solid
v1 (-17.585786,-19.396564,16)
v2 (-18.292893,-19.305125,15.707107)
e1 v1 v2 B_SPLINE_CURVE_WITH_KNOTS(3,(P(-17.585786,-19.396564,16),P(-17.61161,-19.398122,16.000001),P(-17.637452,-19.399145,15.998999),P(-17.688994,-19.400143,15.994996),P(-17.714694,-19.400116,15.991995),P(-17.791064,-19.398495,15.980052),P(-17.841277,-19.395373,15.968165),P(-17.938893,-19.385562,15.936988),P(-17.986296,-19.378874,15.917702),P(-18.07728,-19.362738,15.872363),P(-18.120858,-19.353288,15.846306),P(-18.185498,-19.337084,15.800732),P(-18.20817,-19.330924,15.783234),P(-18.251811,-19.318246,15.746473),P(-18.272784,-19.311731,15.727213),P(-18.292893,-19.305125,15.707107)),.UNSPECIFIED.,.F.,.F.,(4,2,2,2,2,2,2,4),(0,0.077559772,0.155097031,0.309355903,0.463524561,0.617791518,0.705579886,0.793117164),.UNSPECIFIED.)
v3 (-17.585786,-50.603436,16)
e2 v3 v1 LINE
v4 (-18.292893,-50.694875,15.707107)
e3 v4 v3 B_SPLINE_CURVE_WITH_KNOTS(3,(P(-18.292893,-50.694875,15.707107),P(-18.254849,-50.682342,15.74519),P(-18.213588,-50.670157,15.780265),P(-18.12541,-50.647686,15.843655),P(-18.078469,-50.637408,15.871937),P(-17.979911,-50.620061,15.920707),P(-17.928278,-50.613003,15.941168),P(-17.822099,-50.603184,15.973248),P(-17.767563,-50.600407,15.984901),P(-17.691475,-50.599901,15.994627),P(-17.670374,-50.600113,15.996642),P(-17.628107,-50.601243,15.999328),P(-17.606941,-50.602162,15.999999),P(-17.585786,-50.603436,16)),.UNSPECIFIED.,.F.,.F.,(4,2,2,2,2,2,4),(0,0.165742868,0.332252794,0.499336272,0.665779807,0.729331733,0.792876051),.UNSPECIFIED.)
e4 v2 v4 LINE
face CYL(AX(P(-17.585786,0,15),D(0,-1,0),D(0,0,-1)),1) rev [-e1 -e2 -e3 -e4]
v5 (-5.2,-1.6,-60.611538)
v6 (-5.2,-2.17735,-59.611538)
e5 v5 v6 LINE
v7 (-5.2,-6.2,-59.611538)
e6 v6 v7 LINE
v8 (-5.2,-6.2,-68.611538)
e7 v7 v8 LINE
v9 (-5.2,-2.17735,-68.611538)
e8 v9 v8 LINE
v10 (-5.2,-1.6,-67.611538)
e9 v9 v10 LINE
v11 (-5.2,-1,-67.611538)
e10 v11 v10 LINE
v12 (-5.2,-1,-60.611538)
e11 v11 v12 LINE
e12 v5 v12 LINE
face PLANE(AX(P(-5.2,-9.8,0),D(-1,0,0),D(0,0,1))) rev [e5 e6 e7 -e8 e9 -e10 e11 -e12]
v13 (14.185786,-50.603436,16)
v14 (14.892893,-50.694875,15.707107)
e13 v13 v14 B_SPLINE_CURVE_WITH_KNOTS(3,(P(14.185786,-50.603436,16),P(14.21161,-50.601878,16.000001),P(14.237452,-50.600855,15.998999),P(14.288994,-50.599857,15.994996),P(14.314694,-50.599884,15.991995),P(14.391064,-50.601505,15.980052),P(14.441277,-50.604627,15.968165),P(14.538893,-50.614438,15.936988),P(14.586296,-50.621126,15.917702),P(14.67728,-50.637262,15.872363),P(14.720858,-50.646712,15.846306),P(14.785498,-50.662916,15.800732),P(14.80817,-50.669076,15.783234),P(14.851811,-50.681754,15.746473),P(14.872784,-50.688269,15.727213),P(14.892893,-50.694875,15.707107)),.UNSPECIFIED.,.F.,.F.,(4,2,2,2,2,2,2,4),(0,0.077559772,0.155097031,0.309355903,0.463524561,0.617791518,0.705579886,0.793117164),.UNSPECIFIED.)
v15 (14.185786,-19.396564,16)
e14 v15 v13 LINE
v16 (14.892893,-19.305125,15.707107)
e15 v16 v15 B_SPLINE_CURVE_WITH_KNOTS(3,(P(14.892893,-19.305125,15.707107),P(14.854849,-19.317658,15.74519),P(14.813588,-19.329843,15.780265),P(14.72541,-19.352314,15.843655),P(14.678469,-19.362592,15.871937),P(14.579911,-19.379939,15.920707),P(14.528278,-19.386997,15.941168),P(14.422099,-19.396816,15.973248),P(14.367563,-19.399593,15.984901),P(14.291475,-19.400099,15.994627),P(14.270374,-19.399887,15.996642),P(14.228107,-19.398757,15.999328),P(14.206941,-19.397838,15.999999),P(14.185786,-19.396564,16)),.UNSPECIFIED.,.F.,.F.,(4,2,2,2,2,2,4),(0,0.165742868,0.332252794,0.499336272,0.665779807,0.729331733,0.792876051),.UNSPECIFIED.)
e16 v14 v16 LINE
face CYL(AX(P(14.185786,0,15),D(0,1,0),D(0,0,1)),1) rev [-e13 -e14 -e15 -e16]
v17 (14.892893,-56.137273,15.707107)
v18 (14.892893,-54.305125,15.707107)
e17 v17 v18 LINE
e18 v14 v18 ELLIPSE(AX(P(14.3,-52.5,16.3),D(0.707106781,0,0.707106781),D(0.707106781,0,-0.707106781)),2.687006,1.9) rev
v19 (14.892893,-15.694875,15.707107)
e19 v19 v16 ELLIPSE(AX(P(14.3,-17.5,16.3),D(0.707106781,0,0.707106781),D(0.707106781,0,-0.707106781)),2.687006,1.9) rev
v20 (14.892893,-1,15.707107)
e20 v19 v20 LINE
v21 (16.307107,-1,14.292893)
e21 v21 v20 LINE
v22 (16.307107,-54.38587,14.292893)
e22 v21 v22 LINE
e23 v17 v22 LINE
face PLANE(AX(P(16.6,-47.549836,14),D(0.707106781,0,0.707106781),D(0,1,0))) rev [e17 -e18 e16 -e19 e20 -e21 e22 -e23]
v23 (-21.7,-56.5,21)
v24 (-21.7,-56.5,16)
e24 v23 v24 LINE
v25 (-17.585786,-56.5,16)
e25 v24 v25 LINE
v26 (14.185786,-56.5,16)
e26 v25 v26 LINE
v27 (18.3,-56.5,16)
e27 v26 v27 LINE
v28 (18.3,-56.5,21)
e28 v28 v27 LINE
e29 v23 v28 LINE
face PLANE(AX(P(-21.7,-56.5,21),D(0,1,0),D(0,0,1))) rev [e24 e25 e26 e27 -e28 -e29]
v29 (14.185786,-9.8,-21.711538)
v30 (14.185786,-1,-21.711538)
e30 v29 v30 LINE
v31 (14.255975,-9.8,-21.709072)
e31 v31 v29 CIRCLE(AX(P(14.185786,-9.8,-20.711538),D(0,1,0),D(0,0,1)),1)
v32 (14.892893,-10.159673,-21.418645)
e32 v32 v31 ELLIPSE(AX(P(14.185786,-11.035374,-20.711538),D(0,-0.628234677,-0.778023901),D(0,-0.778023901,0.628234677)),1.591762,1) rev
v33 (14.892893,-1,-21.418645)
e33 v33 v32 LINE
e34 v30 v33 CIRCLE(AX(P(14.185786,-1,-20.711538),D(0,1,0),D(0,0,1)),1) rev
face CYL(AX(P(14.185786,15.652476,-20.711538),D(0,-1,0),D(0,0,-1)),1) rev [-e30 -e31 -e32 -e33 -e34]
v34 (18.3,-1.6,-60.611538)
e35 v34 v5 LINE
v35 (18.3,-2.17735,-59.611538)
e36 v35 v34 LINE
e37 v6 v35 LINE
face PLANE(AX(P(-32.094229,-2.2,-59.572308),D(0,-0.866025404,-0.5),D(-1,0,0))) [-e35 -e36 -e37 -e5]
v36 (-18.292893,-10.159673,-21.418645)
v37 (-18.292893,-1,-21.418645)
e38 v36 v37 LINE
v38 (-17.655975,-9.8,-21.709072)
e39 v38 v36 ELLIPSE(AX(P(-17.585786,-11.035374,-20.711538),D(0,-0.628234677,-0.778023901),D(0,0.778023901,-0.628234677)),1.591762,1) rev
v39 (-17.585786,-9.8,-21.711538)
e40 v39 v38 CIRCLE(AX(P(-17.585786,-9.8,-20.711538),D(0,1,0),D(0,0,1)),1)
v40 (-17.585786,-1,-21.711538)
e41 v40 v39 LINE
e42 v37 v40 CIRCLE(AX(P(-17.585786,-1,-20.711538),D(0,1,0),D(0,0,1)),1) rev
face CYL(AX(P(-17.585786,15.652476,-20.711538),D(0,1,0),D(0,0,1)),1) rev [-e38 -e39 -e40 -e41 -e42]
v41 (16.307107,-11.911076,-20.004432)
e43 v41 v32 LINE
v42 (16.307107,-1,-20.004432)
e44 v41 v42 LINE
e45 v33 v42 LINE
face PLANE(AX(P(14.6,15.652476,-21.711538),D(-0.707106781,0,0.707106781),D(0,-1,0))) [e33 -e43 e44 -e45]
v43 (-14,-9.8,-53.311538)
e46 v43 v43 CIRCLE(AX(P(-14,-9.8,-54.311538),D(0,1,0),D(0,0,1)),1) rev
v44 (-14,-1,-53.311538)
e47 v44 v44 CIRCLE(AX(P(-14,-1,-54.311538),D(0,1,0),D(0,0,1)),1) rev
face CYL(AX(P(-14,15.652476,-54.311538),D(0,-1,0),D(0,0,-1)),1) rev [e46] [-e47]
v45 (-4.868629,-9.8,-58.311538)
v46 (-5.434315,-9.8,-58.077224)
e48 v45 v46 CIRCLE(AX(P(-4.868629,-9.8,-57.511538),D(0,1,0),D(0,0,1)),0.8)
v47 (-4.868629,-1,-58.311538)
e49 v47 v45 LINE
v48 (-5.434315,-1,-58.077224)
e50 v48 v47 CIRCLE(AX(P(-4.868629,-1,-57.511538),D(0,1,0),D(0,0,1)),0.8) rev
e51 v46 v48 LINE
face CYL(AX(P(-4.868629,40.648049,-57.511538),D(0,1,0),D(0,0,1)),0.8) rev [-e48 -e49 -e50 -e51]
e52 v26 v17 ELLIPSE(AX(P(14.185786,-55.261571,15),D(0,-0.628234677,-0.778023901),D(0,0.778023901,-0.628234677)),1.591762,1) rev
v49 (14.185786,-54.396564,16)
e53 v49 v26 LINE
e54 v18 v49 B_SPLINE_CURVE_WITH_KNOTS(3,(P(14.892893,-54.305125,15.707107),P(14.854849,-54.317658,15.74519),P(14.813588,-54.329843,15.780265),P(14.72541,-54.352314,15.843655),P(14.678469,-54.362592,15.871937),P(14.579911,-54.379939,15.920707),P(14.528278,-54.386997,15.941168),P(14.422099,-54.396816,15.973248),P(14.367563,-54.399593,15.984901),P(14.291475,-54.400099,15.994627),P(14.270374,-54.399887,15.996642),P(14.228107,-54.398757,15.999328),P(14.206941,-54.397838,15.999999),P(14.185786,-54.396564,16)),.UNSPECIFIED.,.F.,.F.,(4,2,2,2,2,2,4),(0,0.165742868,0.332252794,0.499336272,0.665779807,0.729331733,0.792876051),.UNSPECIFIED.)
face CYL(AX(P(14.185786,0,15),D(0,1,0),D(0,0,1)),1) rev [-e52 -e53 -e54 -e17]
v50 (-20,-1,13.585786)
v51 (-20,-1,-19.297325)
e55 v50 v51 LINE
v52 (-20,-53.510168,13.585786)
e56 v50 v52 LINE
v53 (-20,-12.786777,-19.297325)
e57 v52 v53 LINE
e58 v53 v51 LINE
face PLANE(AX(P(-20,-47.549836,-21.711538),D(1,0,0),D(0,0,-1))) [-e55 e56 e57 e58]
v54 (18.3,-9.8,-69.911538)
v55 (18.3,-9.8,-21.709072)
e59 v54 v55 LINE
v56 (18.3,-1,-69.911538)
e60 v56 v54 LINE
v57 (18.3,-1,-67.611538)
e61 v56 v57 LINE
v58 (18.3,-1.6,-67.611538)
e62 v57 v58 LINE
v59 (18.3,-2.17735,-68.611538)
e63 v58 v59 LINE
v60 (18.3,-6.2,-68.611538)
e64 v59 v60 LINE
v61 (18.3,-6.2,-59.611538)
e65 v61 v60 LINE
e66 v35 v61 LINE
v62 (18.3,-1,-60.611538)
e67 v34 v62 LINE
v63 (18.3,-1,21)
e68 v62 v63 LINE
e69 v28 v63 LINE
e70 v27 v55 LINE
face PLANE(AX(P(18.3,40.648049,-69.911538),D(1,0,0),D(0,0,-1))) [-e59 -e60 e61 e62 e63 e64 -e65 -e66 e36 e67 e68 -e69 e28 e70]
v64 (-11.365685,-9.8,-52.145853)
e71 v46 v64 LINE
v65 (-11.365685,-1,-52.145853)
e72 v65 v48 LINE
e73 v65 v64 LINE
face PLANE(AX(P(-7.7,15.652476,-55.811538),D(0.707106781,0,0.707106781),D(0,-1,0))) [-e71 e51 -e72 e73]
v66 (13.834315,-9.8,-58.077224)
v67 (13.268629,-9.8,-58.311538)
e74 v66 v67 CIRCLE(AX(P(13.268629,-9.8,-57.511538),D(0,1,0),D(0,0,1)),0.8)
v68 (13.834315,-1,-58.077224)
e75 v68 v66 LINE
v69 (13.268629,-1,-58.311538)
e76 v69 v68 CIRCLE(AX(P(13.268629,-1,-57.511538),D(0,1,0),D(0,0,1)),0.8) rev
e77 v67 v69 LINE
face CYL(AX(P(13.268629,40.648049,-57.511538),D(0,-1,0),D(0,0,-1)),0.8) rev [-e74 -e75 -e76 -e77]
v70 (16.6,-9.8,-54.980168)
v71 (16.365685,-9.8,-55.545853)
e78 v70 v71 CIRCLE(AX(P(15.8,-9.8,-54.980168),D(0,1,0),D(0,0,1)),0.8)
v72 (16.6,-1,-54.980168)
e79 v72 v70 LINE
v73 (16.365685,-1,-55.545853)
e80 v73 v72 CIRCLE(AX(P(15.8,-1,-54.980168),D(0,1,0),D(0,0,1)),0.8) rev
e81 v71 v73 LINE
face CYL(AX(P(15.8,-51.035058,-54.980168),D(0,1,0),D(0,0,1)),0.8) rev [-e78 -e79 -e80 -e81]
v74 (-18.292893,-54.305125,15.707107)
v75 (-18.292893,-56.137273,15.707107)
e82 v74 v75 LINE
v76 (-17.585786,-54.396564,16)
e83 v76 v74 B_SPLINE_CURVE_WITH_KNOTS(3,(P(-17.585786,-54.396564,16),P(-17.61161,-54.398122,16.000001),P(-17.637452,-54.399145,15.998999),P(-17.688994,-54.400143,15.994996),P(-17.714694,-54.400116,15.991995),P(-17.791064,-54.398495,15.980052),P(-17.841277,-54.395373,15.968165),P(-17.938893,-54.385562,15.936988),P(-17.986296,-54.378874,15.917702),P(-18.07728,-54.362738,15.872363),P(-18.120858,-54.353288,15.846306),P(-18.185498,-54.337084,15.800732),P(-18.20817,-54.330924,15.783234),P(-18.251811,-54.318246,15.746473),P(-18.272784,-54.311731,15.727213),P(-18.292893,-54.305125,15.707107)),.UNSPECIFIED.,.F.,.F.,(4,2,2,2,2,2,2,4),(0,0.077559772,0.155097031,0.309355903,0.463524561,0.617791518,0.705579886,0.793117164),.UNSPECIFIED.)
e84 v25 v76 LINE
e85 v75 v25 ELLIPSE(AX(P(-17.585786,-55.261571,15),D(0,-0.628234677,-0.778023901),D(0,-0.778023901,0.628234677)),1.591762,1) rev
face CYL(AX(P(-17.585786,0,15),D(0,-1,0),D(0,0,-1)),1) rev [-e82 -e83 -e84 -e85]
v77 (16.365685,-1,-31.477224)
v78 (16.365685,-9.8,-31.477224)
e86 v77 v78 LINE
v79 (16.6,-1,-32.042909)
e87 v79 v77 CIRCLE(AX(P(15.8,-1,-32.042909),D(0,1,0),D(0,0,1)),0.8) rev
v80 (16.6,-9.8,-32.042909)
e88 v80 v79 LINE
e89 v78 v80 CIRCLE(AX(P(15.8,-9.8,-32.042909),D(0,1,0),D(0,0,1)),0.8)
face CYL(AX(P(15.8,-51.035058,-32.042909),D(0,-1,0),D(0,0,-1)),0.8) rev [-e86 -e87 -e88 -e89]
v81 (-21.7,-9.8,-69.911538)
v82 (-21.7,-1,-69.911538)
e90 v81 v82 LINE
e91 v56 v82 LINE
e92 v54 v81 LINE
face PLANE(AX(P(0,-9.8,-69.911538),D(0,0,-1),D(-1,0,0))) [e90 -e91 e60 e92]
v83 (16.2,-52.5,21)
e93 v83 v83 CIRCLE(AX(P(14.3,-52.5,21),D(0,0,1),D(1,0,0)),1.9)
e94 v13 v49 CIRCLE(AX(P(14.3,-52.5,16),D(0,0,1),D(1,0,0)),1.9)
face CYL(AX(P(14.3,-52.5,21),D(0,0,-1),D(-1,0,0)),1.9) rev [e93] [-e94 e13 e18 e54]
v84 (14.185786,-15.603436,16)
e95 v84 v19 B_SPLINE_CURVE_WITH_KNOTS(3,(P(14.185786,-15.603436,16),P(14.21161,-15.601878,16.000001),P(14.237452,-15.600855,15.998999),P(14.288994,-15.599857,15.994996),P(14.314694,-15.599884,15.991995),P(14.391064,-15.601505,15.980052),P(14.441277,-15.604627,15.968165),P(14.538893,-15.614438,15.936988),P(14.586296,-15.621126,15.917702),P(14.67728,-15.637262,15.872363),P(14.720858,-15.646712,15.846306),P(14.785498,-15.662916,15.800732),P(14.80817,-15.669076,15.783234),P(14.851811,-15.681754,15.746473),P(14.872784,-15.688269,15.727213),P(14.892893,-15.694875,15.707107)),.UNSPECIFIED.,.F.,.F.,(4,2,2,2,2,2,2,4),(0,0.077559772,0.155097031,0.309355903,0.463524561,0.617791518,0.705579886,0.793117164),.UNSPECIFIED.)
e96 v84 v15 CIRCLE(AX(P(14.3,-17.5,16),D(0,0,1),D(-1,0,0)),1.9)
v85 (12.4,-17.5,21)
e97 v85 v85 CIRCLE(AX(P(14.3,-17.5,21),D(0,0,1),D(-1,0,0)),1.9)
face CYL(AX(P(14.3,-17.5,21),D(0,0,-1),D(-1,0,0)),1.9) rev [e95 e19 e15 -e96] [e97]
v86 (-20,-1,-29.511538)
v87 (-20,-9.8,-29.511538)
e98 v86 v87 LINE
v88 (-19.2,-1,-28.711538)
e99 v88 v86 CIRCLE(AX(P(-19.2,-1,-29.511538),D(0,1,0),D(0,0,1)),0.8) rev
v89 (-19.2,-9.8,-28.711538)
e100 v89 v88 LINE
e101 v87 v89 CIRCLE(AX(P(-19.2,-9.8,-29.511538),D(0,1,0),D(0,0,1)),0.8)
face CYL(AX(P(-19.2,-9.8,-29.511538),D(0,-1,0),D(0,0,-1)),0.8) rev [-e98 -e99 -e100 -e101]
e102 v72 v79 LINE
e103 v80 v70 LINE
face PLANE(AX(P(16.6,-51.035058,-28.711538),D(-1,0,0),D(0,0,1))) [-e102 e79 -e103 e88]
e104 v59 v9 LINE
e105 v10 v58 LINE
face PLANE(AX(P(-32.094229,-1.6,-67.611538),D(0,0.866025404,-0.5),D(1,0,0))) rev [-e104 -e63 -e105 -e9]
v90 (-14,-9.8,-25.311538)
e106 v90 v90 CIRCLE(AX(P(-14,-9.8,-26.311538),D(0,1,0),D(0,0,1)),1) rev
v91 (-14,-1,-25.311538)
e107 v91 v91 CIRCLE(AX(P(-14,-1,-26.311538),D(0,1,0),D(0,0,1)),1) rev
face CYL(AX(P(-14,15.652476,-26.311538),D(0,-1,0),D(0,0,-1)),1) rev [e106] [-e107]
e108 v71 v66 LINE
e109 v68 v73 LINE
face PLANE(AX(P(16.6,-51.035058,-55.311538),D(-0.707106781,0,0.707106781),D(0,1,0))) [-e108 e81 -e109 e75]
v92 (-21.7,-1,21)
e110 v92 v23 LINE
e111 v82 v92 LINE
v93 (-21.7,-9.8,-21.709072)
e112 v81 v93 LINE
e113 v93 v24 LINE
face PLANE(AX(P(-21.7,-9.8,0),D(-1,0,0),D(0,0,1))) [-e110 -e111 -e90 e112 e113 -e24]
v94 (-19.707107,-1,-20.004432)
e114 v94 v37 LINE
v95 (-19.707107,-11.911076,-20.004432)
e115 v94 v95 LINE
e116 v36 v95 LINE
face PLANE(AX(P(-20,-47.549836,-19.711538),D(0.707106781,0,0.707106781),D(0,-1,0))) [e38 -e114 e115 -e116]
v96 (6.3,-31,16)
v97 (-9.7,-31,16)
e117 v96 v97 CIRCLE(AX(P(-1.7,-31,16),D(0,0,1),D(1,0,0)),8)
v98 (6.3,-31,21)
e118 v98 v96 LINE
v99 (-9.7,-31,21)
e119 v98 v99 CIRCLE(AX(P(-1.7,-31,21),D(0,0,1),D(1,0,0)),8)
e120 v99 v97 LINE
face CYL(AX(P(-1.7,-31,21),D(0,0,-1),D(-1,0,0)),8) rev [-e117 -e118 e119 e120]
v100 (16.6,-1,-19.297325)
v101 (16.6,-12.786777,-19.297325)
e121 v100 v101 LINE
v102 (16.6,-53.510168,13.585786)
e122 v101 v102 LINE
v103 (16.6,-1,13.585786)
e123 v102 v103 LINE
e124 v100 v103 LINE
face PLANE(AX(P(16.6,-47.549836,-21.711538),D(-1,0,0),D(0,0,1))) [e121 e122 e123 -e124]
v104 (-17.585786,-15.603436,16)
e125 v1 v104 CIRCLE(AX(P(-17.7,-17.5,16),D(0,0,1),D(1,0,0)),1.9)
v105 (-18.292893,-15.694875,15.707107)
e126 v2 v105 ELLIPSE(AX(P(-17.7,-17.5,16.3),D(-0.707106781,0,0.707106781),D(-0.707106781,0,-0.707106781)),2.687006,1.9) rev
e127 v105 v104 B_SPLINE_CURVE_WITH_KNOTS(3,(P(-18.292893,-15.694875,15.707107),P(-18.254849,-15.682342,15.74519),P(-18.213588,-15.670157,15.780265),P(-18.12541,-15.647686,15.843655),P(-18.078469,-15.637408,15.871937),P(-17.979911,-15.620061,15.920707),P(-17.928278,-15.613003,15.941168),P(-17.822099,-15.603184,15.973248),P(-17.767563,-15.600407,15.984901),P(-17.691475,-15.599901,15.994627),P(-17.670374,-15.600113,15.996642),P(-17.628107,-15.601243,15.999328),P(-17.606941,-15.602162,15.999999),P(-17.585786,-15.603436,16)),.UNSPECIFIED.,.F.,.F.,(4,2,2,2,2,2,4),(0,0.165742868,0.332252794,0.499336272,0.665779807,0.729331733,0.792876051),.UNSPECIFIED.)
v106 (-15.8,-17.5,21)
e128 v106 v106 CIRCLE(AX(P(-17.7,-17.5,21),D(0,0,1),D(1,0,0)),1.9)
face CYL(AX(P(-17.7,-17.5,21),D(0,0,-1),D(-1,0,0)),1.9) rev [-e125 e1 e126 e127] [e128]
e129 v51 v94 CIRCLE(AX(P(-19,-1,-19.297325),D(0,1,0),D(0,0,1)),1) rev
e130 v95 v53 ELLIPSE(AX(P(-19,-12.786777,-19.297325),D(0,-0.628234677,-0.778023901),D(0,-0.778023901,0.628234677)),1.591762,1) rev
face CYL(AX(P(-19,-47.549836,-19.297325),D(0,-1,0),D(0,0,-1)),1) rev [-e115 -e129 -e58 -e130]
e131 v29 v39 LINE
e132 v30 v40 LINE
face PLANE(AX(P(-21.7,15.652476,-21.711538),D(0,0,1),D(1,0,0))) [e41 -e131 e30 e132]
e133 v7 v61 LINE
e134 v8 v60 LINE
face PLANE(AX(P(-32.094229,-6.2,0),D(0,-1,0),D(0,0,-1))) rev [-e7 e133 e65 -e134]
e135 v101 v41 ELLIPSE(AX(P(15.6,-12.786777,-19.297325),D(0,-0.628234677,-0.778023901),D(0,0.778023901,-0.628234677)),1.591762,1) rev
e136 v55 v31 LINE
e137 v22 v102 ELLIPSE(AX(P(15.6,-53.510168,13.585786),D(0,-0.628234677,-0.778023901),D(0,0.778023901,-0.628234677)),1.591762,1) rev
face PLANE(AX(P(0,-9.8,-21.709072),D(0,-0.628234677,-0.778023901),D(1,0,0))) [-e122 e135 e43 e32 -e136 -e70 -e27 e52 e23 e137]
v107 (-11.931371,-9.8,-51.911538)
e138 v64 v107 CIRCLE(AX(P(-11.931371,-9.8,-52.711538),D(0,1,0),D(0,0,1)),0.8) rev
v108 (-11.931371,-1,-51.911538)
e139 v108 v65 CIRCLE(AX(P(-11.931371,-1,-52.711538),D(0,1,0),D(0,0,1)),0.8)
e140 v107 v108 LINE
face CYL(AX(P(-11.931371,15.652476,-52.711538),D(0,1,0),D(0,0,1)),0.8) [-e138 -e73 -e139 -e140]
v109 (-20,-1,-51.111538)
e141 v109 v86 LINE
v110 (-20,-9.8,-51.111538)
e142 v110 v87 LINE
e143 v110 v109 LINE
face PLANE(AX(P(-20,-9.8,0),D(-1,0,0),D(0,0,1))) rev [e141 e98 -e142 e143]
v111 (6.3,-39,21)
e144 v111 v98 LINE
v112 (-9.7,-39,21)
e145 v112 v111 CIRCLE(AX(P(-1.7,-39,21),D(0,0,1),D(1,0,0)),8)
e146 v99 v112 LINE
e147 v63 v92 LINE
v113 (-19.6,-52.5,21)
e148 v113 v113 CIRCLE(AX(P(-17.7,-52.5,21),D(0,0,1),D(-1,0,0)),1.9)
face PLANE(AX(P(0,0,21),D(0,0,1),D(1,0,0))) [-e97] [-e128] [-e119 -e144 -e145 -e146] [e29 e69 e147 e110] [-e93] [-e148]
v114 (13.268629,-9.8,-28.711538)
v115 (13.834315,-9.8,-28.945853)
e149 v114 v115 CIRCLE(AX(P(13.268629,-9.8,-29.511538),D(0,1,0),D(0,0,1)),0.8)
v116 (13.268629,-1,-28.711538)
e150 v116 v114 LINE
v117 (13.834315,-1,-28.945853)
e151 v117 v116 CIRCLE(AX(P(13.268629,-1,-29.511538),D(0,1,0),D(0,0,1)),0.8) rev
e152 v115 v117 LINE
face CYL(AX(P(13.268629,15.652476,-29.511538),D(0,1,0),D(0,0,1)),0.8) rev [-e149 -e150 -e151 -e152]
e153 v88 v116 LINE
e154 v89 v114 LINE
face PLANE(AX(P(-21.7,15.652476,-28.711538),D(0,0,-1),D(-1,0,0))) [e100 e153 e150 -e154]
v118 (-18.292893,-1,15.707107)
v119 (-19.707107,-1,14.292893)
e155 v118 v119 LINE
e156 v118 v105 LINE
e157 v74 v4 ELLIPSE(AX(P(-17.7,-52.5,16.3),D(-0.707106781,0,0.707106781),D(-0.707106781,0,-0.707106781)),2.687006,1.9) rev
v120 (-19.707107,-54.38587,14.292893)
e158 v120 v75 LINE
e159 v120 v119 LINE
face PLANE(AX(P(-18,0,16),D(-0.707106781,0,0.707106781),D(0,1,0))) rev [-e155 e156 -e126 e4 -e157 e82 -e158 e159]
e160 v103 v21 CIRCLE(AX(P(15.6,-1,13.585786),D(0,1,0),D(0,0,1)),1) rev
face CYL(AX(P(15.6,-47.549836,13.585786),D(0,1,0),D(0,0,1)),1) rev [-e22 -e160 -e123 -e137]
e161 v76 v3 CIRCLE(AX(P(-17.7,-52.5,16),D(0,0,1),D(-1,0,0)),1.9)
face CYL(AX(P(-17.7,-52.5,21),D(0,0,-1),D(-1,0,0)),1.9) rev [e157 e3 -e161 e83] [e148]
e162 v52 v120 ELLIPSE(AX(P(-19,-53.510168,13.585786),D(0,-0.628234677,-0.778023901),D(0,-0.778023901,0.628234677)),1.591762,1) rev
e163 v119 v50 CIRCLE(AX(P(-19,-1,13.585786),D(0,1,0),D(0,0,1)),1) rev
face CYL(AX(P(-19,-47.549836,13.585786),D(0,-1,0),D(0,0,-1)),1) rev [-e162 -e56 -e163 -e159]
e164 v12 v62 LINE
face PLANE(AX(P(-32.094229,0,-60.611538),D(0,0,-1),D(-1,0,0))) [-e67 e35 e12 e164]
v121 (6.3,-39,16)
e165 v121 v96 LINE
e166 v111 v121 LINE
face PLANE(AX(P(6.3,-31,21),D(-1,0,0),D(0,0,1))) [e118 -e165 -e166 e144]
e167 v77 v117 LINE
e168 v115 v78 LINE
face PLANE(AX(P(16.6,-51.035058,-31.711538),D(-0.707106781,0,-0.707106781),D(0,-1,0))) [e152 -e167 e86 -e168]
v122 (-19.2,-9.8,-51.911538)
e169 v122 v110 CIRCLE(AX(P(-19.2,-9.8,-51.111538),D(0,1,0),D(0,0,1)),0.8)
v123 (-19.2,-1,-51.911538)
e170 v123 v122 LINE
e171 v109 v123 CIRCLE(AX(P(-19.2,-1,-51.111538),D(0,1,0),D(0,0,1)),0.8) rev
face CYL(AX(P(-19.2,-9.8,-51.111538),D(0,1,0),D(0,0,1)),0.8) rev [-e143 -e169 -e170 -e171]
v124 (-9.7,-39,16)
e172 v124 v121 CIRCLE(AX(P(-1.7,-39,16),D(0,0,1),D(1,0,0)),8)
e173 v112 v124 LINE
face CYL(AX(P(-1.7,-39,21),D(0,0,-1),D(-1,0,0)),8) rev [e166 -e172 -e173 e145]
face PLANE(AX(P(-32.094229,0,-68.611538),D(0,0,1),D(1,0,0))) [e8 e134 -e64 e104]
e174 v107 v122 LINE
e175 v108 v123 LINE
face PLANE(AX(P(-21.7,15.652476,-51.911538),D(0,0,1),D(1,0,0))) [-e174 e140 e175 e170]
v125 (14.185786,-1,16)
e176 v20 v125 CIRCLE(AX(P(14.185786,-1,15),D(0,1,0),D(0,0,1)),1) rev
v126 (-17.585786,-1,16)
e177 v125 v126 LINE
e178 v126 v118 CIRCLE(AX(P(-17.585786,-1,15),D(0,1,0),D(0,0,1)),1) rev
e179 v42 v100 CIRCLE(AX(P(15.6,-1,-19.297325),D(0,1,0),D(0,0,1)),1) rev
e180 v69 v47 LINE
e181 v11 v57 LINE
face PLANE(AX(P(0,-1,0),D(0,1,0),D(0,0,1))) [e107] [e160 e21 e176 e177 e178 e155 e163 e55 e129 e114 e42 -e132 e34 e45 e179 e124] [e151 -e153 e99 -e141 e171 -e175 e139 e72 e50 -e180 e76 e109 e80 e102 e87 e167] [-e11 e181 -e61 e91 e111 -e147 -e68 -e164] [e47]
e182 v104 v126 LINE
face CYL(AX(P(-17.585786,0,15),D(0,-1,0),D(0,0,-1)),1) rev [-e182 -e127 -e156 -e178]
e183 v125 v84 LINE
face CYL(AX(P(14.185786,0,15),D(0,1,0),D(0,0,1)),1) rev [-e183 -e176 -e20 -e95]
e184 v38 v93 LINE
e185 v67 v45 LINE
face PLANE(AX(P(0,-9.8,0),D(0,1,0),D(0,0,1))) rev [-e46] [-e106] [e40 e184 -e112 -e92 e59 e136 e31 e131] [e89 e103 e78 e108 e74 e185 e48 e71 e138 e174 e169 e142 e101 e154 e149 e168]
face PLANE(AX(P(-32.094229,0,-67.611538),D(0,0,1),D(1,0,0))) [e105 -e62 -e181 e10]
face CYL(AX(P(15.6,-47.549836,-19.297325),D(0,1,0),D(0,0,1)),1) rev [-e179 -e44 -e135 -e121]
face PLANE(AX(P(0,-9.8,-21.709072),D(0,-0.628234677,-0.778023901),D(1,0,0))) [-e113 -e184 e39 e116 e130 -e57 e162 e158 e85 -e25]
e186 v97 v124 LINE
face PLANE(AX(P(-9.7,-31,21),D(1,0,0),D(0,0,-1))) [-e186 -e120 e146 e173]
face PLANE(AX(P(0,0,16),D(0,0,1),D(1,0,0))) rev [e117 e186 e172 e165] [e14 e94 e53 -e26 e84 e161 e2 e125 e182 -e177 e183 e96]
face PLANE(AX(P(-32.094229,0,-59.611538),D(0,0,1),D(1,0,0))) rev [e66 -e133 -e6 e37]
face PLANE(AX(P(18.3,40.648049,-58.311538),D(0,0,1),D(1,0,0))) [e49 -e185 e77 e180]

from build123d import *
from OCP.BRepFilletAPI import BRepFilletAPI_MakeChamfer

# Parameters (mm, degrees)
BOSS_EXTRUDE1_START      = -1
SKETCH1_W                = 1.7
SKETCH1_H                = 89.2
BOSS_EXTRUDE1_DEPTH      = 8.8
SKETCH4_W                = 40
SKETCH4_H                = 11.6
BOSS_EXTRUDE3_DEPTH      = 8.8
SERVO_HOLDER_DEPTH       = 1
SERVO_HOLDER_DEPTH_BACK  = 8.8
SKETCH3_W                = 14
SKETCH3_H                = 7
SKETCH3_R                = 1
SKETCH37_W               = 26
SKETCH37_H               = 7
BOSS_EXTRUDE19_DEPTH     = 9.8
CUT_EXTRUDE10_DEPTH      = 93.434679639
CUT_EXTRUDE10_DEPTH_BACK = 93.434679639
SKETCH29_W               = 49.101454262
SKETCH29_H               = 6.377389624
BOSS_EXTRUDE17_DEPTH     = 3
SKETCH39_W               = 1.7
SKETCH39_H               = 41.2
BOSS_EXTRUDE20_DEPTH     = 8.8
CUT_EXTRUDE13_DEPTH      = 23.5
CHAMFER2_SIZE            = 0.6
CHAMFER2_SIZE_2          = 1.039230485
CHAMFER3_SIZE            = 3
CHAMFER4_SIZE            = 2.5
CUT_EXTRUDE16_DEPTH      = 10
FILLET11_R               = 0.8
SKETCH51_W               = 40
SKETCH51_H               = 41
CUT_EXTRUDE17_DEPTH      = 10
SKETCH50_W               = 40
SKETCH50_H               = 55.5
SKETCH50_R               = 1.9
BOSS_EXTRUDE24_DEPTH     = 5
SKETCH53_W               = 1.7
SKETCH53_H               = 37.711538462
BOSS_EXTRUDE25_DEPTH     = 8.8
CHAMFER6_SIZE            = 37.709072194
CHAMFER6_SIZE_2          = 46.7
CHAMFER5_SIZE            = 2
FILLET13_R               = 1


# Some blends are built 0.0001 mm under size
with BuildPart() as part:
    # Sketch1 → Boss-Extrude1 (new body)
    with BuildSketch(Plane(origin=(0, 0, 0), x_dir=(1, 0, 0), z_dir=(0, 1, 0)).offset(BOSS_EXTRUDE1_START)):
        with Locations((-20.85, 25.311538462)):
            Rectangle(SKETCH1_W, SKETCH1_H)
    extrude(amount=-BOSS_EXTRUDE1_DEPTH)

    # Sketch4 → Boss-Extrude3 (add)
    with BuildSketch(Plane.XZ.offset(9.8)):
        with Locations((-1.7, -64.111538462)):
            Rectangle(SKETCH4_W, SKETCH4_H)
    extrude(amount=-BOSS_EXTRUDE3_DEPTH)

    # Sketch3 → Servo Holder (add, two sides: drawn at the far end of the back side and taken through both)
    # profile 1 of 2: a face of its own
    with BuildSketch(Plane.XZ.offset(9.8).offset(-SERVO_HOLDER_DEPTH_BACK)):
        with Locations((-14.7, -55.411538462)):
            Rectangle(SKETCH3_W, SKETCH3_H)
        with Locations(Location((-14, -54.311538462, 0), (0, 0, 270))):
            Circle(SKETCH3_R, mode=Mode.SUBTRACT)
    # profile 2 of 2: a face of its own
    with BuildSketch(Plane.XZ.offset(9.8).offset(-SERVO_HOLDER_DEPTH_BACK)):
        with Locations((-14.7, -25.211538462)):
            Rectangle(SKETCH3_W, SKETCH3_H)
        with Locations(Location((-14, -26.311538462, 0), (0, 0, 90))):
            Circle(SKETCH3_R, mode=Mode.SUBTRACT)
    extrude(amount=SERVO_HOLDER_DEPTH + SERVO_HOLDER_DEPTH_BACK)

    # Sketch37 → Boss-Extrude19 (add)
    with BuildSketch(Plane(origin=(0, -1, 0), x_dir=(1, 0, 0), z_dir=(0, 1, 0))):
        with Locations((5.3, 25.211538462)):
            Rectangle(SKETCH37_W, SKETCH37_H)
    extrude(amount=-BOSS_EXTRUDE19_DEPTH)

    # Sketch29 → Cut-Extrude10 (cut, two sides: drawn at the far end of the back side and taken through both)
    with BuildSketch(Plane(origin=(0, 0, -69.911538462), x_dir=(-1, 0, 0), z_dir=(0, 0, -1)).offset(-CUT_EXTRUDE10_DEPTH_BACK)):
        with Locations((-2.850727131, -12.988694812)):
            Rectangle(SKETCH29_W, SKETCH29_H)
    extrude(amount=CUT_EXTRUDE10_DEPTH + CUT_EXTRUDE10_DEPTH_BACK, mode=Mode.SUBTRACT)

    # Sketch35 → Boss-Extrude17 (add)
    with BuildSketch(Plane(origin=(18.3, 0, 0), x_dir=(0, 0, -1), z_dir=(1, 0, 0))):
        Polygon((-2, -1), (21.711538462, -1), (21.711538462, -9.8), (-19.288461538, -9.8), (-19.288461538, -1), align=None)
    extrude(amount=-BOSS_EXTRUDE17_DEPTH)

    # Sketch39 → Boss-Extrude20 (add)
    with BuildSketch(Plane(origin=(0, -1, 0), x_dir=(1, 0, 0), z_dir=(0, 1, 0))):
        with Locations((17.45, 49.311538462)):
            Rectangle(SKETCH39_W, SKETCH39_H)
    extrude(amount=-BOSS_EXTRUDE20_DEPTH)

    # Sketch40 → Cut-Extrude13 (cut)
    with BuildSketch(Plane(origin=(18.3, 0, 0), x_dir=(0, 0, -1), z_dir=(1, 0, 0))):
        Polygon((64.111538462, -1), (60.611538462, -1), (60.611538462, -2.2), (59.611538462, -2.2), (59.611538462, -6.2), (64.111538462, -6.2), align=None)
        Polygon((67.611538462, -1), (64.111538462, -1), (64.111538462, -6.2), (68.611538462, -6.2), (68.611538462, -2.2), (67.611538462, -2.2), align=None)
    extrude(amount=-CUT_EXTRUDE13_DEPTH, mode=Mode.SUBTRACT)

    # Chamfer2
    # the kernel refuses this chamfer: 1.039230485, 0.6 mm, written as the material it takes off along each edge
    with BuildSketch(Plane(origin=(20.988578382, -2.2, -60.611538462), x_dir=(0, 0.9983227437537925, -0.05789386240267317), z_dir=(-1, 0, 0))) as chamfer2_piece_1_section:
        Polygon((CHAMFER2_SIZE * 0.998322743754, -CHAMFER2_SIZE * 0.0578938624027), (-CHAMFER2_SIZE_2 * 0.0578938623771, -CHAMFER2_SIZE_2 * 0.998322743313), (0, 0), align=None)
    chamfer2_piece_1 = extrude(amount=26.188578382, mode=Mode.PRIVATE)
    chamfer2_piece_1 = split(chamfer2_piece_1, bisect_by=Plane(origin=(7.894289191, -2.005782009, -59.611538462), z_dir=(0, 0, -1)), keep=Keep.TOP, mode=Mode.PRIVATE)
    add(chamfer2_piece_1, mode=Mode.SUBTRACT)
    with BuildSketch(Plane(origin=(20.988578382, -2.2, -67.611538462), x_dir=(0, 0.9983227437537925, 0.05789386240267317), z_dir=(-1, 0, 0))) as chamfer2_piece_2_section:
        Polygon((CHAMFER2_SIZE * 0.998322743754, CHAMFER2_SIZE * 0.0578938624027), (-CHAMFER2_SIZE_2 * 0.0578938623771, CHAMFER2_SIZE_2 * 0.998322743313), (0, 0), align=None)
    chamfer2_piece_2 = extrude(amount=26.188578382, mode=Mode.PRIVATE)
    chamfer2_piece_2 = split(chamfer2_piece_2, bisect_by=Plane(origin=(7.894289191, -2.005782009, -68.611538462), z_dir=(0, 0, 1)), keep=Keep.TOP, mode=Mode.PRIVATE)
    add(chamfer2_piece_2, mode=Mode.SUBTRACT)

    # Chamfer3
    chamfer3_edges = [part.edges().sort_by_distance(p)[0] for p in [
        (16.6, -5.4, -58.311538462),
        (16.6, -5.4, -28.711538462),
    ]]
    chamfer(chamfer3_edges, length=CHAMFER3_SIZE)

    # Chamfer4
    chamfer4_edges = [part.edges().sort_by_distance(p)[0] for p in [
        (-7.7, -5.4, -58.311538462),
    ]]
    chamfer(chamfer4_edges, length=CHAMFER4_SIZE)

    # Sketch43 → Cut-Extrude16 (cut)
    with BuildSketch(Plane(origin=(0, -1, 0), x_dir=(1, 0, 0), z_dir=(0, 1, 0))):
        Polygon((-5.2, 58.311538462), (-11.6, 51.911538462), (-5.2, 51.911538462), align=None)
    extrude(amount=-CUT_EXTRUDE16_DEPTH, mode=Mode.SUBTRACT)

    # Fillet11
    fillet11_edges = [part.edges().sort_by_distance(p)[0] for p in [
        (16.6, -5.4, -55.311538462),
        (16.6, -5.4, -31.711538462),
        (13.6, -5.4, -28.711538462),
        (13.6, -5.4, -58.311538462),
        (-5.2, -5.4, -58.311538462),
        (-11.6, -5.4, -51.911538462),
        (-20, -5.4, -51.911538462),
        (-20, -5.4, -28.711538462),
    ]]
    fillet(fillet11_edges, radius=FILLET11_R)

    # Sketch51 → Cut-Extrude17 (cut)
    with BuildSketch(Plane(origin=(0, -1, 0), x_dir=(1, 0, 0), z_dir=(0, 1, 0))):
        with Locations((-1.7, 1.211538462)):
            Rectangle(SKETCH51_W, SKETCH51_H)
    extrude(amount=-CUT_EXTRUDE17_DEPTH, mode=Mode.SUBTRACT)



with BuildPart() as body_2:
    # Sketch50 → Boss-Extrude24 (new body)
    with BuildSketch(Plane.XY.offset(16)):
        with Locations((-1.7, -28.75)):
            Rectangle(SKETCH50_W, SKETCH50_H)
        with Locations((-17.7, -17.5)):
            Circle(SKETCH50_R, mode=Mode.SUBTRACT)
        with Locations(Location((14.3, -17.5, 0), (0, 0, 180))):
            Circle(SKETCH50_R, mode=Mode.SUBTRACT)
        with Locations((14.3, -52.5)):
            Circle(SKETCH50_R, mode=Mode.SUBTRACT)
        with Locations(Location((-17.7, -52.5, 0), (0, 0, 180))):
            Circle(SKETCH50_R, mode=Mode.SUBTRACT)
        with BuildLine():
            Line((6.3, -31), (6.3, -39))
            ThreePointArc((6.3, -39), (-1.7, -47), (-9.7, -39))
            Line((-9.7, -39), (-9.7, -31))
            ThreePointArc((-9.7, -31), (-1.7, -23), (6.3, -31))
        make_face(mode=Mode.SUBTRACT)
    extrude(amount=BOSS_EXTRUDE24_DEPTH)


with BuildPart() as part_1:
    add(part.part)

    add(body_2.part)  # Boss-Extrude25 merges body 2
    # Sketch53 → Boss-Extrude25 (add)
    with BuildSketch(Plane(origin=(0, -1, 0), x_dir=(1, 0, 0), z_dir=(0, 1, 0))):
        with Locations((17.45, 2.855769231)):
            Rectangle(SKETCH53_W, SKETCH53_H)
        with Locations((-20.85, 2.855769231)):
            Rectangle(SKETCH53_W, SKETCH53_H)
    extrude(amount=-BOSS_EXTRUDE25_DEPTH)

    # Chamfer6
    chamfer6_edges_1 = [part_1.edges().sort_by_distance(p)[0] for p in [
        (17.45, -9.8, 16),
    ]]
    chamfer6_side_1 = [part_1.faces().sort_by_distance(p)[0] for p in [
        (17.45, -9.8, 15.245818556),
    ]]
    chamfer6_edges_2 = [part_1.edges().sort_by_distance(p)[0] for p in [
        (-20.85, -9.8, 16),
    ]]
    chamfer6_side_2 = [part_1.faces().sort_by_distance(p)[0] for p in [
        (-20.85, -9.8, 15.245818556),
    ]]
    chamfer6 = BRepFilletAPI_MakeChamfer(part_1.part.solid().wrapped)
    for e in chamfer6_edges_1:
        chamfer6.Add(CHAMFER6_SIZE - 0.0001, CHAMFER6_SIZE_2 - 0.0001, e.wrapped, chamfer6_side_1[0].wrapped)
    for e in chamfer6_edges_2:
        chamfer6.Add(CHAMFER6_SIZE - 0.0001, CHAMFER6_SIZE_2 - 0.0001, e.wrapped, chamfer6_side_2[0].wrapped)
    add(Compound.cast(chamfer6.Shape()), mode=Mode.REPLACE)  # a hair under: the kernel refuses the full size

    # Chamfer5
    # the kernel refuses this chamfer: 2 mm, written as the material it adds along each edge
    with BuildSketch(Plane(origin=(16.6, -1, -21.711538462), x_dir=(0.027495876610585647, 0, 0.9996219169112968), z_dir=(0, -1, 0))) as chamfer5_piece_1_section:
        Polygon((CHAMFER5_SIZE * 0.999621916911, CHAMFER5_SIZE * 0.0274958766106), (-CHAMFER5_SIZE * 0.0274958766106, CHAMFER5_SIZE * 0.999621916911), (0, 0), align=None)
    chamfer5_piece_1 = extrude(amount=8.8, mode=Mode.PRIVATE)
    chamfer5_piece_1 = split(chamfer5_piece_1, bisect_by=Plane(origin=(15.940558744, -7.457267814, -23.600668383), z_dir=(0, 0.6282344833325636, 0.7780240574377293)), keep=Keep.TOP, mode=Mode.PRIVATE)
    add(chamfer5_piece_1)
    with BuildSketch(Plane(origin=(16.6, -1, -21.711538462), x_dir=(0.027495876610585647, 0, 0.9996219169112968), z_dir=(0, -1, 0))) as chamfer5_piece_2_section:
        Polygon((CHAMFER5_SIZE * 0.999621916911, CHAMFER5_SIZE * 0.0274958766106), (-CHAMFER5_SIZE * 0.0274958766106, CHAMFER5_SIZE * 0.999621916911), (0, 0), align=None)
    chamfer5_piece_2 = extrude(amount=8.8, mode=Mode.PRIVATE)
    chamfer5_piece_2 = split(chamfer5_piece_2, bisect_by=Plane(origin=(15.205194682, -9.762152332, -21.739533216), z_dir=(0, -0.6282344833325636, -0.7780240574377293)), keep=Keep.TOP, mode=Mode.PRIVATE)
    add(chamfer5_piece_2)
    with BuildSketch(Plane(origin=(16.6, -1, -21.711538462), x_dir=(0.027495876610585647, 0, 0.9996219169112968), z_dir=(0, -1, 0))) as chamfer5_piece_3_section:
        Polygon((CHAMFER5_SIZE * 0.999621916911, CHAMFER5_SIZE * 0.0274958766106), (-CHAMFER5_SIZE * 0.0274958766106, CHAMFER5_SIZE * 0.999621916911), (0, 0), align=None)
    chamfer5_piece_3 = extrude(amount=13.943365976, mode=Mode.PRIVATE)
    chamfer5_piece_3 = split(chamfer5_piece_3, bisect_by=Plane(origin=(16.145077407, -9.8, -20.667672286), z_dir=(0, -1, 0)), keep=Keep.TOP, mode=Mode.PRIVATE)
    chamfer5_piece_3 = split(chamfer5_piece_3, bisect_by=Plane(origin=(16.145077407, -10.6992723, -20.982832863), z_dir=(0, 0.6282344833325636, 0.7780240574377293)), keep=Keep.TOP, mode=Mode.PRIVATE)
    add(chamfer5_piece_3)
    with BuildSketch(Plane(origin=(16.6, -61.643265976, 16), x_dir=(-0.9996219169112968, 0, 0.027495876610585623), z_dir=(0, 1, 0))) as chamfer5_piece_4_section:
        Polygon((CHAMFER5_SIZE * 0.999621916911, -CHAMFER5_SIZE * 0.0274958766106), (-CHAMFER5_SIZE * 0.0274958766106, -CHAMFER5_SIZE * 0.999621916911), (0, 0), align=None)
    chamfer5_piece_4 = extrude(amount=60.643265976, mode=Mode.PRIVATE)
    chamfer5_piece_4 = split(chamfer5_piece_4, bisect_by=Plane(origin=(15.9626445, -38.896337805, 1.785574758), z_dir=(0, 0.6282344833325636, 0.7780240574377293)), keep=Keep.TOP, mode=Mode.PRIVATE)
    chamfer5_piece_4 = split(chamfer5_piece_4, bisect_by=Plane(origin=(15.9626445, -56.5, 15.333023777), z_dir=(0, 1, 0)), keep=Keep.TOP, mode=Mode.PRIVATE)
    chamfer5_piece_4 = chamfer5_piece_4 - Plane(origin=(14.3, -52.5, 15.333023777), x_dir=(1, 0, 0), z_dir=(0, 0, -1)) * Cylinder(1.9, 130, mode=Mode.PRIVATE)
    chamfer5_piece_4 = chamfer5_piece_4 - Plane(origin=(14.3, -17.5, 15.333023777), x_dir=(-1, 0, 0), z_dir=(0, 0, -1)) * Cylinder(1.9, 130, mode=Mode.PRIVATE)
    add(chamfer5_piece_4)
    with BuildSketch(Plane(origin=(-20, -1, 16), x_dir=(0.9996219169112968, 0, 0.027495876610585647), z_dir=(0, -1, 0))) as chamfer5_piece_5_section:
        Polygon((CHAMFER5_SIZE * 0.999621916911, -CHAMFER5_SIZE * 0.0274958766106), (-CHAMFER5_SIZE * 0.0274958766106, -CHAMFER5_SIZE * 0.999621916911), (0, 0), align=None)
    chamfer5_piece_5 = extrude(amount=60.643265976, mode=Mode.PRIVATE)
    chamfer5_piece_5 = split(chamfer5_piece_5, bisect_by=Plane(origin=(-19.362644591, -38.896335996, 1.785573298), z_dir=(0, 0.6282344833325636, 0.7780240574377292)), keep=Keep.TOP, mode=Mode.PRIVATE)
    chamfer5_piece_5 = split(chamfer5_piece_5, bisect_by=Plane(origin=(-19.362644591, -56.5, 15.333023677), z_dir=(0, 1, 0)), keep=Keep.TOP, mode=Mode.PRIVATE)
    chamfer5_piece_5 = chamfer5_piece_5 - Plane(origin=(-17.7, -52.5, 15.333023677), x_dir=(-1, 0, 0), z_dir=(0, 0, -1)) * Cylinder(1.9, 130, mode=Mode.PRIVATE)
    chamfer5_piece_5 = chamfer5_piece_5 - Plane(origin=(-17.7, -17.5, 15.333023677), x_dir=(1, 0, 0), z_dir=(0, 0, -1)) * Cylinder(1.9, 130, mode=Mode.PRIVATE)
    add(chamfer5_piece_5)
    with BuildSketch(Plane(origin=(-20, -1, -21.711538462), x_dir=(0.9996219169112968, 0, -0.0274958766105856), z_dir=(0, -1, 0))) as chamfer5_piece_6_section:
        Polygon((CHAMFER5_SIZE * 0.999621916911, CHAMFER5_SIZE * 0.0274958766106), (-CHAMFER5_SIZE * 0.0274958766106, CHAMFER5_SIZE * 0.999621916911), (0, 0), align=None)
    chamfer5_piece_6 = extrude(amount=8.8, mode=Mode.PRIVATE)
    chamfer5_piece_6 = split(chamfer5_piece_6, bisect_by=Plane(origin=(-19.340558744, -7.457267814, -23.600668383), z_dir=(0, 0.6282344833325636, 0.7780240574377292)), keep=Keep.TOP, mode=Mode.PRIVATE)
    add(chamfer5_piece_6)
    with BuildSketch(Plane(origin=(-20, -1, -21.711538462), x_dir=(0.9996219169112968, 0, -0.0274958766105856), z_dir=(0, -1, 0))) as chamfer5_piece_7_section:
        Polygon((CHAMFER5_SIZE * 0.999621916911, CHAMFER5_SIZE * 0.0274958766106), (-CHAMFER5_SIZE * 0.0274958766106, CHAMFER5_SIZE * 0.999621916911), (0, 0), align=None)
    chamfer5_piece_7 = extrude(amount=13.943365976, mode=Mode.PRIVATE)
    chamfer5_piece_7 = split(chamfer5_piece_7, bisect_by=Plane(origin=(-19.545077407, -9.8, -20.667672286), z_dir=(0, -1, 0)), keep=Keep.TOP, mode=Mode.PRIVATE)
    chamfer5_piece_7 = split(chamfer5_piece_7, bisect_by=Plane(origin=(-19.545077407, -10.6992723, -20.982832863), z_dir=(0, 0.6282344833325636, 0.7780240574377292)), keep=Keep.TOP, mode=Mode.PRIVATE)
    add(chamfer5_piece_7)
    with BuildSketch(Plane(origin=(-20, -1, -21.711538462), x_dir=(0.9996219169112968, 0, -0.0274958766105856), z_dir=(0, -1, 0))) as chamfer5_piece_8_section:
        Polygon((CHAMFER5_SIZE * 0.999621916911, CHAMFER5_SIZE * 0.0274958766106), (-CHAMFER5_SIZE * 0.0274958766106, CHAMFER5_SIZE * 0.999621916911), (0, 0), align=None)
    chamfer5_piece_8 = extrude(amount=8.8, mode=Mode.PRIVATE)
    chamfer5_piece_8 = split(chamfer5_piece_8, bisect_by=Plane(origin=(-18.605194682, -9.762152332, -21.739533216), z_dir=(0, -0.6282344833325636, -0.7780240574377292)), keep=Keep.TOP, mode=Mode.PRIVATE)
    add(chamfer5_piece_8)

    # Fillet13
    # the kernel refuses this fillet: 1 mm, written as the material it adds along each edge
    with BuildSketch(Plane(origin=(16.6, -55.058575096, 14), x_dir=(0, 0, -1), z_dir=(0, 1, 0))) as fillet13_piece_1_section:
        with BuildLine():
            CenterArc((FILLET13_R * 0.414213562373, FILLET13_R), FILLET13_R, 225, 45)
            Line((-FILLET13_R * 0.292893218813, FILLET13_R * 0.292893218813), (0, 0))
            Line((0, 0), (FILLET13_R * 0.414213562373, 0))
        make_face()
    fillet13_piece_1 = extrude(amount=54.058575096, mode=Mode.PRIVATE)
    fillet13_piece_1 = split(fillet13_piece_1, bisect_by=Plane(origin=(16.537950877, -37.953464011, 1.024228339), z_dir=(0, 0.6282344833326955, 0.7780240574376227)), keep=Keep.TOP, mode=Mode.PRIVATE)
    add(fillet13_piece_1)
    with BuildSketch(Plane(origin=(14.6, -16.659367602, 16), x_dir=(0.7071067811862666, 0, -0.7071067811868285), z_dir=(0, 1, 0))) as fillet13_piece_2_section:
        with BuildLine():
            CenterArc((FILLET13_R * 0.414213562373, FILLET13_R), FILLET13_R, 225, 45)
            Line((-FILLET13_R * 0.292893218813, FILLET13_R * 0.292893218814), (0, 0))
            Line((0, 0), (FILLET13_R * 0.414213562373, 0))
        make_face()
    fillet13_piece_2 = extrude(amount=15.659367602, mode=Mode.PRIVATE)
    fillet13_piece_2 = fillet13_piece_2 - Plane(origin=(14.3, -17.5, 15.93807593), x_dir=(-1, 0, 0), z_dir=(0, 0, -1)) * Cylinder(1.9, 33, mode=Mode.PRIVATE)
    add(fillet13_piece_2)
    with BuildSketch(Plane(origin=(16.6, -13.309214575, -19.711538462), x_dir=(-0.7071067811868306, 0, -0.7071067811862645), z_dir=(0, 1, 0))) as fillet13_piece_3_section:
        with BuildLine():
            CenterArc((FILLET13_R * 0.414213562373, FILLET13_R), FILLET13_R, 225, 45)
            Line((-FILLET13_R * 0.292893218814, FILLET13_R * 0.292893218814), (0, 0))
            Line((0, 0), (FILLET13_R * 0.414213562373, 0))
        make_face()
    fillet13_piece_3 = extrude(amount=12.309214575, mode=Mode.PRIVATE)
    fillet13_piece_3 = split(fillet13_piece_3, bisect_by=Plane(origin=(16.539310025, -8.886151888, -22.44688112), z_dir=(0, 0.6282344833326955, 0.7780240574376227)), keep=Keep.TOP, mode=Mode.PRIVATE)
    add(fillet13_piece_3)
    with BuildSketch(Plane(origin=(14.6, -1, -21.711538462), x_dir=(-1.0, 0, -3.0276843699474774e-12), z_dir=(0, -1, 0))) as fillet13_piece_4_section:
        with BuildLine():
            CenterArc((FILLET13_R * 0.41421356237, -FILLET13_R), FILLET13_R, 90, 45)
            Line((-FILLET13_R * 0.292893218815, -FILLET13_R * 0.292893218812), (0, 0))
            Line((0, 0), (FILLET13_R * 0.414213562373, 0))
        make_face()
    fillet13_piece_4 = extrude(amount=8.8, mode=Mode.PRIVATE)
    fillet13_piece_4 = split(fillet13_piece_4, bisect_by=Plane(origin=(14.574467182, -7.164487701, -23.837080819), z_dir=(0, 0.6282344833326955, 0.7780240574376227)), keep=Keep.TOP, mode=Mode.PRIVATE)
    add(fillet13_piece_4)
    with BuildSketch(Plane(origin=(14.6, -1, -21.711538462), x_dir=(-1.0, 0, -3.0276843699474774e-12), z_dir=(0, -1, 0))) as fillet13_piece_5_section:
        with BuildLine():
            CenterArc((FILLET13_R * 0.41421356237, -FILLET13_R), FILLET13_R, 90, 45)
            Line((-FILLET13_R * 0.292893218815, -FILLET13_R * 0.292893218812), (0, 0))
            Line((0, 0), (FILLET13_R * 0.414213562373, 0))
        make_face()
    fillet13_piece_5 = extrude(amount=9.835533906, mode=Mode.PRIVATE)
    fillet13_piece_5 = split(fillet13_piece_5, bisect_by=Plane(origin=(14.731074395, -9.8, -21.56358461), z_dir=(0, -1, 0)), keep=Keep.TOP, mode=Mode.PRIVATE)
    fillet13_piece_5 = split(fillet13_piece_5, bisect_by=Plane(origin=(14.731074395, -9.925557513, -21.60758772), z_dir=(0, 0.6282344833326955, 0.7780240574376227)), keep=Keep.TOP, mode=Mode.PRIVATE)
    add(fillet13_piece_5)
    with BuildSketch(Plane(origin=(14.6, -1, -21.711538462), x_dir=(-1.0, 0, -3.0276843699474774e-12), z_dir=(0, -1, 0))) as fillet13_piece_6_section:
        with BuildLine():
            CenterArc((FILLET13_R * 0.41421356237, -FILLET13_R), FILLET13_R, 90, 45)
            Line((-FILLET13_R * 0.292893218815, -FILLET13_R * 0.292893218812), (0, 0))
            Line((0, 0), (FILLET13_R * 0.414213562373, 0))
        make_face()
    fillet13_piece_6 = extrude(amount=8.8, mode=Mode.PRIVATE)
    fillet13_piece_6 = split(fillet13_piece_6, bisect_by=Plane(origin=(14.401050879, -9.787051161, -21.71942805), z_dir=(0, -0.6282344833326955, -0.7780240574376227)), keep=Keep.TOP, mode=Mode.PRIVATE)
    add(fillet13_piece_6)
    with BuildSketch(Plane(origin=(-18, -9.8, -21.711538462), x_dir=(-0.7071067811862645, 0, 0.7071067811868306), z_dir=(0, 1, 0))) as fillet13_piece_7_section:
        with BuildLine():
            CenterArc((FILLET13_R * 0.414213562373, FILLET13_R), FILLET13_R, 225, 45)
            Line((-FILLET13_R * 0.292893218814, FILLET13_R * 0.292893218814), (0, 0))
            Line((0, 0), (FILLET13_R * 0.414213562373, 0))
        make_face()
    fillet13_piece_7 = extrude(amount=8.8, mode=Mode.PRIVATE)
    fillet13_piece_7 = split(fillet13_piece_7, bisect_by=Plane(origin=(-17.801050877, -9.787051161, -21.719428049), z_dir=(0, -0.6282344833326955, -0.7780240574376227)), keep=Keep.TOP, mode=Mode.PRIVATE)
    add(fillet13_piece_7)
    with BuildSketch(Plane(origin=(-18, -10.835533906, -21.711538462), x_dir=(-0.7071067811862645, 0, 0.7071067811868306), z_dir=(0, 1, 0))) as fillet13_piece_8_section:
        with BuildLine():
            CenterArc((FILLET13_R * 0.414213562373, FILLET13_R), FILLET13_R, 225, 45)
            Line((-FILLET13_R * 0.292893218814, FILLET13_R * 0.292893218814), (0, 0))
            Line((0, 0), (FILLET13_R * 0.414213562373, 0))
        make_face()
    fillet13_piece_8 = extrude(amount=9.835533906, mode=Mode.PRIVATE)
    fillet13_piece_8 = split(fillet13_piece_8, bisect_by=Plane(origin=(-18.131074399, -9.8, -21.563584609), z_dir=(0, -1, 0)), keep=Keep.TOP, mode=Mode.PRIVATE)
    fillet13_piece_8 = split(fillet13_piece_8, bisect_by=Plane(origin=(-18.131074399, -9.925557514, -21.607587719), z_dir=(0, 0.6282344833326955, 0.7780240574376227)), keep=Keep.TOP, mode=Mode.PRIVATE)
    add(fillet13_piece_8)
    with BuildSketch(Plane(origin=(-18, -9.8, -21.711538462), x_dir=(-0.7071067811862645, 0, 0.7071067811868306), z_dir=(0, 1, 0))) as fillet13_piece_9_section:
        with BuildLine():
            CenterArc((FILLET13_R * 0.414213562373, FILLET13_R), FILLET13_R, 225, 45)
            Line((-FILLET13_R * 0.292893218814, FILLET13_R * 0.292893218814), (0, 0))
            Line((0, 0), (FILLET13_R * 0.414213562373, 0))
        make_face()
    fillet13_piece_9 = extrude(amount=8.8, mode=Mode.PRIVATE)
    fillet13_piece_9 = split(fillet13_piece_9, bisect_by=Plane(origin=(-17.974467182, -7.164487702, -23.837080819), z_dir=(0, 0.6282344833326955, 0.7780240574376227)), keep=Keep.TOP, mode=Mode.PRIVATE)
    add(fillet13_piece_9)
    with BuildSketch(Plane(origin=(-20, -1, -19.711538462), x_dir=(0.7071067811862645, 0, -0.7071067811868306), z_dir=(0, -1, 0))) as fillet13_piece_10_section:
        with BuildLine():
            CenterArc((FILLET13_R * 0.414213562373, FILLET13_R), FILLET13_R, 225, 45)
            Line((-FILLET13_R * 0.292893218813, FILLET13_R * 0.292893218813), (0, 0))
            Line((0, 0), (FILLET13_R * 0.414213562373, 0))
        make_face()
    fillet13_piece_10 = extrude(amount=12.309214575, mode=Mode.PRIVATE)
    fillet13_piece_10 = split(fillet13_piece_10, bisect_by=Plane(origin=(-19.939310025, -8.886151888, -22.44688112), z_dir=(0, 0.6282344833326955, 0.7780240574376227)), keep=Keep.TOP, mode=Mode.PRIVATE)
    add(fillet13_piece_10)
    with BuildSketch(Plane(origin=(-18, -1, 16), x_dir=(-0.7071067811862667, 0, -0.7071067811868285), z_dir=(0, -1, 0))) as fillet13_piece_11_section:
        with BuildLine():
            CenterArc((FILLET13_R * 0.414213562373, FILLET13_R), FILLET13_R, 225, 45)
            Line((-FILLET13_R * 0.292893218814, FILLET13_R * 0.292893218814), (0, 0))
            Line((0, 0), (FILLET13_R * 0.414213562373, 0))
        make_face()
    fillet13_piece_11 = extrude(amount=15.659367602, mode=Mode.PRIVATE)
    fillet13_piece_11 = fillet13_piece_11 - Plane(origin=(-17.7, -17.5, 15.938075915), x_dir=(1, 0, 0), z_dir=(0, 0, -1)) * Cylinder(1.9, 33, mode=Mode.PRIVATE)
    add(fillet13_piece_11)
    with BuildSketch(Plane(origin=(-20, -1, 14), x_dir=(0.7071067811862645, 0, 0.7071067811868306), z_dir=(0, -1, 0))) as fillet13_piece_12_section:
        with BuildLine():
            CenterArc((FILLET13_R * 0.414213562373, -FILLET13_R), FILLET13_R, 90, 45)
            Line((-FILLET13_R * 0.292893218813, -FILLET13_R * 0.292893218813), (0, 0))
            Line((0, 0), (FILLET13_R * 0.414213562373, 0))
        make_face()
    fillet13_piece_12 = extrude(amount=54.058575096, mode=Mode.PRIVATE)
    fillet13_piece_12 = split(fillet13_piece_12, bisect_by=Plane(origin=(-19.937950877, -37.953464011, 1.024228339), z_dir=(0, 0.6282344833326955, 0.7780240574376227)), keep=Keep.TOP, mode=Mode.PRIVATE)
    add(fillet13_piece_12)
    with BuildSketch(Plane(origin=(-18, -53.340632398, 16), x_dir=(-0.7071067811862645, 0, -0.7071067811868306), z_dir=(0, -1, 0))) as fillet13_piece_13_section:
        with BuildLine():
            CenterArc((FILLET13_R * 0.414213562373, FILLET13_R), FILLET13_R, 225, 45)
            Line((-FILLET13_R * 0.292893218814, FILLET13_R * 0.292893218814), (0, 0))
            Line((0, 0), (FILLET13_R * 0.414213562373, 0))
        make_face()
    fillet13_piece_13 = extrude(amount=4.194801508, mode=Mode.PRIVATE)
    fillet13_piece_13 = fillet13_piece_13 - Plane(origin=(-17.7, -52.5, 15.940638952), x_dir=(-1, 0, 0), z_dir=(0, 0, -1)) * Cylinder(1.9, 11, mode=Mode.PRIVATE)
    fillet13_piece_13 = split(fillet13_piece_13, bisect_by=Plane(origin=(-17.970170366, -55.804263886, 15.438291669), z_dir=(0, 0.6282344833326955, 0.7780240574376227)), keep=Keep.TOP, mode=Mode.PRIVATE)
    fillet13_piece_13 = split(fillet13_piece_13, bisect_by=Plane(origin=(-17.970170366, -56.5, 15.940638952), z_dir=(0, 1, 0)), keep=Keep.TOP, mode=Mode.PRIVATE)
    add(fillet13_piece_13)
    with BuildSketch(Plane(origin=(-18, -18.340632398, 16), x_dir=(-0.7071067811862645, 0, -0.7071067811868306), z_dir=(0, -1, 0))) as fillet13_piece_14_section:
        with BuildLine():
            CenterArc((FILLET13_R * 0.414213562373, FILLET13_R), FILLET13_R, 225, 45)
            Line((-FILLET13_R * 0.292893218814, FILLET13_R * 0.292893218814), (0, 0))
            Line((0, 0), (FILLET13_R * 0.414213562373, 0))
        make_face()
    fillet13_piece_14 = extrude(amount=33.318735204, mode=Mode.PRIVATE)
    fillet13_piece_14 = fillet13_piece_14 - Plane(origin=(-17.7, -52.5, 15.938083204), x_dir=(-1, 0, 0), z_dir=(0, 0, -1)) * Cylinder(1.9, 69, mode=Mode.PRIVATE)
    fillet13_piece_14 = fillet13_piece_14 - Plane(origin=(-17.7, -17.5, 15.938083204), x_dir=(1, 0, 0), z_dir=(0, 0, -1)) * Cylinder(1.9, 69, mode=Mode.PRIVATE)
    add(fillet13_piece_14)
    with BuildSketch(Plane(origin=(14.6, -57.535433906, 16), x_dir=(0.7071067811862666, 0, -0.7071067811868285), z_dir=(0, 1, 0))) as fillet13_piece_15_section:
        with BuildLine():
            CenterArc((FILLET13_R * 0.414213562373, FILLET13_R), FILLET13_R, 225, 45)
            Line((-FILLET13_R * 0.292893218813, FILLET13_R * 0.292893218814), (0, 0))
            Line((0, 0), (FILLET13_R * 0.414213562373, 0))
        make_face()
    fillet13_piece_15 = extrude(amount=4.194801508, mode=Mode.PRIVATE)
    fillet13_piece_15 = split(fillet13_piece_15, bisect_by=Plane(origin=(14.57017034, -55.80426349, 15.438291349), z_dir=(0, 0.6282344833326955, 0.7780240574376227)), keep=Keep.TOP, mode=Mode.PRIVATE)
    fillet13_piece_15 = fillet13_piece_15 - Plane(origin=(14.3, -52.5, 15.940638936), x_dir=(1, 0, 0), z_dir=(0, 0, -1)) * Cylinder(1.9, 11, mode=Mode.PRIVATE)
    fillet13_piece_15 = split(fillet13_piece_15, bisect_by=Plane(origin=(14.57017034, -56.5, 15.940638936), z_dir=(0, 1, 0)), keep=Keep.TOP, mode=Mode.PRIVATE)
    add(fillet13_piece_15)
    with BuildSketch(Plane(origin=(14.6, -51.659367602, 16), x_dir=(0.7071067811862666, 0, -0.7071067811868285), z_dir=(0, 1, 0))) as fillet13_piece_16_section:
        with BuildLine():
            CenterArc((FILLET13_R * 0.414213562373, FILLET13_R), FILLET13_R, 225, 45)
            Line((-FILLET13_R * 0.292893218813, FILLET13_R * 0.292893218814), (0, 0))
            Line((0, 0), (FILLET13_R * 0.414213562373, 0))
        make_face()
    fillet13_piece_16 = extrude(amount=33.318735204, mode=Mode.PRIVATE)
    fillet13_piece_16 = fillet13_piece_16 - Plane(origin=(14.3, -17.5, 15.938083204), x_dir=(-1, 0, 0), z_dir=(0, 0, -1)) * Cylinder(1.9, 69, mode=Mode.PRIVATE)
    fillet13_piece_16 = fillet13_piece_16 - Plane(origin=(14.3, -52.5, 15.938083204), x_dir=(1, 0, 0), z_dir=(0, 0, -1)) * Cylinder(1.9, 69, mode=Mode.PRIVATE)
    add(fillet13_piece_16)


solid = part_1.part
